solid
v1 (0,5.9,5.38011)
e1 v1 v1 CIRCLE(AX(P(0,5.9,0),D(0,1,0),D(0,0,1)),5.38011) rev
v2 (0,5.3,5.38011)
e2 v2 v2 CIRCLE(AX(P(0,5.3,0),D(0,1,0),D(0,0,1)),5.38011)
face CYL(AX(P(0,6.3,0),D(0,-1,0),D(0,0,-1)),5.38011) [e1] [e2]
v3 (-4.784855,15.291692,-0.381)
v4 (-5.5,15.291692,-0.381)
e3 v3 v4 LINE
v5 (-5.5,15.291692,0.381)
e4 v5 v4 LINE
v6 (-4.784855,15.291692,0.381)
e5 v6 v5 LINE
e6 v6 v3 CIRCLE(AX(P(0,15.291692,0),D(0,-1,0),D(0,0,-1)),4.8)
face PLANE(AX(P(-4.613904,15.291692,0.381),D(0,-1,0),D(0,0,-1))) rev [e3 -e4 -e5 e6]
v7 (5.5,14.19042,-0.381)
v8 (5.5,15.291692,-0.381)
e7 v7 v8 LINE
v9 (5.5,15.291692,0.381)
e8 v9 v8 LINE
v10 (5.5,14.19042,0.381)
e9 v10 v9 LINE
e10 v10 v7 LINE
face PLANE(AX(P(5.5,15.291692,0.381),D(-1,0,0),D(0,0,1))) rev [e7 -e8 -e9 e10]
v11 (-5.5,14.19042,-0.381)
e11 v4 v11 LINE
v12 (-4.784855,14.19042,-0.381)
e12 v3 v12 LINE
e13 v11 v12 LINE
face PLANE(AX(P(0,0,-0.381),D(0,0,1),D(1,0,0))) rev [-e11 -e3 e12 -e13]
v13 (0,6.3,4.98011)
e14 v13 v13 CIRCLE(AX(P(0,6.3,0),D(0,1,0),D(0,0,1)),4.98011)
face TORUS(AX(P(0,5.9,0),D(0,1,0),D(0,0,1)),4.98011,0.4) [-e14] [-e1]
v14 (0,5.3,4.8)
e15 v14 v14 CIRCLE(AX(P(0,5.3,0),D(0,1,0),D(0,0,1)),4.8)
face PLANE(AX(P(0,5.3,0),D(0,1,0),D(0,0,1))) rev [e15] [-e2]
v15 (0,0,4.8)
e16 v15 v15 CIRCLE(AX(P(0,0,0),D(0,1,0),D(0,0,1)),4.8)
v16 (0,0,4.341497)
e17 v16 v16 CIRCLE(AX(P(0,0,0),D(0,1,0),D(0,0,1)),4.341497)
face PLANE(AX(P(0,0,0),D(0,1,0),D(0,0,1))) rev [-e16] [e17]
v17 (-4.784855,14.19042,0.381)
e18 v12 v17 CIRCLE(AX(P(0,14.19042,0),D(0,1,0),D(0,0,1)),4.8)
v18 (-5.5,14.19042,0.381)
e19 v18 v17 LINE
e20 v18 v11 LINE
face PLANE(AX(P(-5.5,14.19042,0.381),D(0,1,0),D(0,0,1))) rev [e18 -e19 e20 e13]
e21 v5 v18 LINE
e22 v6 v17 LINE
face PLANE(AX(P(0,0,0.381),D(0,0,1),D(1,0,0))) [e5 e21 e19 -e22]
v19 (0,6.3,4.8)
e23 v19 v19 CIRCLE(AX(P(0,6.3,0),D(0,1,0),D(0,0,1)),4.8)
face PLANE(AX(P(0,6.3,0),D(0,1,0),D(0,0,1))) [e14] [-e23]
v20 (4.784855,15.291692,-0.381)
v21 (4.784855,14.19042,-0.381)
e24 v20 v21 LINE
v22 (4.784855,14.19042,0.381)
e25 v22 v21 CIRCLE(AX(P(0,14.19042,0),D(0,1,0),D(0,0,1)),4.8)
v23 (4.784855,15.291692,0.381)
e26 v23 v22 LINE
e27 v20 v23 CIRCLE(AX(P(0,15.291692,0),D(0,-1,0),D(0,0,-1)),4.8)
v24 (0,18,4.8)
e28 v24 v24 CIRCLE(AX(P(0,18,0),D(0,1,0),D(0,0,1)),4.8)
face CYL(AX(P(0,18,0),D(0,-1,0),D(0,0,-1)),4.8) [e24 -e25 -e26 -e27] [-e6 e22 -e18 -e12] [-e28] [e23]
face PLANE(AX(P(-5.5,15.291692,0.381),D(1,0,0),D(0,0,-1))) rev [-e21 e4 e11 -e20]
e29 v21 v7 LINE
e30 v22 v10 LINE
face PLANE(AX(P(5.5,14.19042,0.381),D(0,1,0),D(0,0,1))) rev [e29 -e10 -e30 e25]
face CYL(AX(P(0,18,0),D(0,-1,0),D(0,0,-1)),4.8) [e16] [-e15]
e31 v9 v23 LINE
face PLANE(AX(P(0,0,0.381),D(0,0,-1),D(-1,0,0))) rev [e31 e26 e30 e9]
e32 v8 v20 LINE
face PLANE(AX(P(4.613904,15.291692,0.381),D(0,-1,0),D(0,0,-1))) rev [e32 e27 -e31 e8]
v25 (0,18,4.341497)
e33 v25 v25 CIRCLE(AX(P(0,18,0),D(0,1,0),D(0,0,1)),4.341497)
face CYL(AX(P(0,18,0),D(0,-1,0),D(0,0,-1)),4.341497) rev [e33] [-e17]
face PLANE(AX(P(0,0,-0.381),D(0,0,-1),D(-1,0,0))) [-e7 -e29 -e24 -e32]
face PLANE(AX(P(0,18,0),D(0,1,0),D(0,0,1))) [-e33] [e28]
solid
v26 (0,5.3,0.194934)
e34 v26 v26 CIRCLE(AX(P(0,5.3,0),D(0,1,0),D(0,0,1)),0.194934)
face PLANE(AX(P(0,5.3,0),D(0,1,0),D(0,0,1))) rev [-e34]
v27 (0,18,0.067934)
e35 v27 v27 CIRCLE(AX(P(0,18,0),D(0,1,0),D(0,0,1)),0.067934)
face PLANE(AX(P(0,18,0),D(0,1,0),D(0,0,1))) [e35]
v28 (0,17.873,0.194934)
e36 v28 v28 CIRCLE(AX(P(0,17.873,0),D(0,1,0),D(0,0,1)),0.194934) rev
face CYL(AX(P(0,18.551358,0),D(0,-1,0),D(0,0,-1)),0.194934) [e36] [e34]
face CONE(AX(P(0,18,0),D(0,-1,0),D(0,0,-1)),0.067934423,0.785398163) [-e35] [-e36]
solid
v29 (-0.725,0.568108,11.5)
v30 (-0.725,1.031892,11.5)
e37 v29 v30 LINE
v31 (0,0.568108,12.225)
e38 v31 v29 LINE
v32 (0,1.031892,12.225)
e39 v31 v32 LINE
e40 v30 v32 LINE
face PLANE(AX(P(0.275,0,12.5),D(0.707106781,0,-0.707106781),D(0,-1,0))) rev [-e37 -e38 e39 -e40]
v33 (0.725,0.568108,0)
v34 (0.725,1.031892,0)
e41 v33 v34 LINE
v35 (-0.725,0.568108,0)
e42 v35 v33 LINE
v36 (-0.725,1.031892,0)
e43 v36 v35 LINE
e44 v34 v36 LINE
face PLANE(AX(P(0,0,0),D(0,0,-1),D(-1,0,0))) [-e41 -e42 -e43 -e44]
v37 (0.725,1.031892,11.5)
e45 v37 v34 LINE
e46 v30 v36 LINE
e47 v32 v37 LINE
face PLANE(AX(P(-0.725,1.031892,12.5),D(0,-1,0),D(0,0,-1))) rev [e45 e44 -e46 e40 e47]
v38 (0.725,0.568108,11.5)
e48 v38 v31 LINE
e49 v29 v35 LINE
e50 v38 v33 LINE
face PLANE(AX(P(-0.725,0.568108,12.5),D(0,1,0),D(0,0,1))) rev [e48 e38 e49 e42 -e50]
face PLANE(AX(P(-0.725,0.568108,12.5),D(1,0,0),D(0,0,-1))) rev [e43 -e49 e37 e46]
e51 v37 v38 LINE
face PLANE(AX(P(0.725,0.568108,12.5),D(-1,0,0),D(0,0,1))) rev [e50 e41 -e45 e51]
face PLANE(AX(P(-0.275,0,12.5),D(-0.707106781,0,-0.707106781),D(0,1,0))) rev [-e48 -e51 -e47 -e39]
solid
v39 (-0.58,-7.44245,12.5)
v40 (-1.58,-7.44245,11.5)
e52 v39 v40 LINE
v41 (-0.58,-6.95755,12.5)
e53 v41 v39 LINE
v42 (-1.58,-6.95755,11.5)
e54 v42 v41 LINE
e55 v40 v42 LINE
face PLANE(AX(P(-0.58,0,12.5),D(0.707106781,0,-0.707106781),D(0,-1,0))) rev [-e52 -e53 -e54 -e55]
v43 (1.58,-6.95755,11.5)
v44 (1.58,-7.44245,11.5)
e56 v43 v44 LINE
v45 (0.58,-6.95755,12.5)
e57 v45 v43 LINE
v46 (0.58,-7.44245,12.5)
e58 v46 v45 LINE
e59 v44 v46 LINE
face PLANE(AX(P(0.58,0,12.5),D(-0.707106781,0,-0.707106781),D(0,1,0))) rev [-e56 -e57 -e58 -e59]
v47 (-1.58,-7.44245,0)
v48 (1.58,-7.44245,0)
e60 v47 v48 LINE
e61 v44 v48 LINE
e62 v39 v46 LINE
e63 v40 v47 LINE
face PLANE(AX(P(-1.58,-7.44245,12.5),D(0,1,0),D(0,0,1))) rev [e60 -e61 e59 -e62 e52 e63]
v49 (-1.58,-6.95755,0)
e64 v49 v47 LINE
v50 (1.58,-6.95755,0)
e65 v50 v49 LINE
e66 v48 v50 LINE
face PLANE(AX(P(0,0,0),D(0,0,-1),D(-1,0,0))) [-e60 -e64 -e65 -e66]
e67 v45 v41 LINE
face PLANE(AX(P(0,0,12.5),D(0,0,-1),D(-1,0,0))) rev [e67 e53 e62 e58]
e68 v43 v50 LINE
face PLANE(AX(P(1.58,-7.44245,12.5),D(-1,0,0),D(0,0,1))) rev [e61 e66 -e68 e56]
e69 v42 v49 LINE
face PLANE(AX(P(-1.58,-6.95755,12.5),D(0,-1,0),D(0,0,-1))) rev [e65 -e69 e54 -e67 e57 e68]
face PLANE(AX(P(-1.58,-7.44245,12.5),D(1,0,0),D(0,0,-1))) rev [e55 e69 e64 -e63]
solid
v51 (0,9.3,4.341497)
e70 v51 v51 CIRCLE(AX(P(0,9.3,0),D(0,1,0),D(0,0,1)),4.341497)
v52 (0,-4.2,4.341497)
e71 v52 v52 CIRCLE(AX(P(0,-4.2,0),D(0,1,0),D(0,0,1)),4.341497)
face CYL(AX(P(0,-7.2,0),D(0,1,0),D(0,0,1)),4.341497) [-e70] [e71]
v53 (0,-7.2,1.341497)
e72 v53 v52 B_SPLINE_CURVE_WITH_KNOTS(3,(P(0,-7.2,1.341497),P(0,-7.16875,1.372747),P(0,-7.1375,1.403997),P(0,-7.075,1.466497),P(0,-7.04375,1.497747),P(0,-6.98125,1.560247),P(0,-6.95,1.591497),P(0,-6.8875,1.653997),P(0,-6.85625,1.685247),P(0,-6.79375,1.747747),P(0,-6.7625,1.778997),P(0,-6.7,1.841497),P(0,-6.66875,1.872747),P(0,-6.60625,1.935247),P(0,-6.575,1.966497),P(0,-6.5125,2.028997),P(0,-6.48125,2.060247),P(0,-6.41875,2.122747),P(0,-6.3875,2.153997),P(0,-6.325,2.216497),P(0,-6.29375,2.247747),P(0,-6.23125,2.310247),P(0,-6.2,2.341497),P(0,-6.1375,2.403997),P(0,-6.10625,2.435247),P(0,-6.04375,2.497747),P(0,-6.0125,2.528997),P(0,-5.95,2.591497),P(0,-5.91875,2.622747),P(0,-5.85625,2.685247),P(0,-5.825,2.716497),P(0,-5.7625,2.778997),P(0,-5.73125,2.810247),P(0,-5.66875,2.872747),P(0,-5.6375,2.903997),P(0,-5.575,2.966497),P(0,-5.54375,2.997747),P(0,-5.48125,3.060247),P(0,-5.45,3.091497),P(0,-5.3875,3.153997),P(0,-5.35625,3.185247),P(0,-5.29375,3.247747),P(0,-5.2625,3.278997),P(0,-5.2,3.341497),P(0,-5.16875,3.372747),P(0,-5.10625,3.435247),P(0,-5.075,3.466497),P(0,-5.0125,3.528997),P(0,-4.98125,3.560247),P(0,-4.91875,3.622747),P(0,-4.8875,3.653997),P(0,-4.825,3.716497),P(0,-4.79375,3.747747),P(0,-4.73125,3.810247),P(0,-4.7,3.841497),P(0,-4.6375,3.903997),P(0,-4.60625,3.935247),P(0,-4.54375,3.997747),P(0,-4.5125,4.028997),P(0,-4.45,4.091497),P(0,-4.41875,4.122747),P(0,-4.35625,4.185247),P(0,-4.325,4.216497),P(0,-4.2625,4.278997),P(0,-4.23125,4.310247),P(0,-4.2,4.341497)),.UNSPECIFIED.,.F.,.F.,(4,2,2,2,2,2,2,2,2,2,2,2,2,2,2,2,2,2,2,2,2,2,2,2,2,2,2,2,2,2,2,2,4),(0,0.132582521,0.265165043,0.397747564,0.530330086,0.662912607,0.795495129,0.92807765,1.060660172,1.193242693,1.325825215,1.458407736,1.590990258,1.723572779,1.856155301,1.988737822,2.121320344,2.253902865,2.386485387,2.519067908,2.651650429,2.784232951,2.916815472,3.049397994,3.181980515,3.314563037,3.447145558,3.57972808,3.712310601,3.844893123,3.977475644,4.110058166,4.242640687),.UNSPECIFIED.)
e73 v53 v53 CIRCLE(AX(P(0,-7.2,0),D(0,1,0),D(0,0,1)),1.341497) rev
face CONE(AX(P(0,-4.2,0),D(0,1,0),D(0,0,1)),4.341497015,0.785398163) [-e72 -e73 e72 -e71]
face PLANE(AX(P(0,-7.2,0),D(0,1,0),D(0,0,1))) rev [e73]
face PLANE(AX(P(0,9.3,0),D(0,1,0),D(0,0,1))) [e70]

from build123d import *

# Parameters (mm, degrees)
SKETCH1_R                = 4.8
SKETCH1_R_2              = 4.341497015
BOSS_EXTRUDE1_DEPTH      = 18
SKETCH2_R                = 5.380109722
SKETCH2_R_2              = 4.8
BOSS_EXTRUDE2_DEPTH      = 1
FILLET1_R                = 0.4
SKETCH3_W                = 0.886095775
SKETCH3_H                = 1.101271723
BOSS_EXTRUDE3_DEPTH      = 0.381
SKETCH4_R                = 0.194934423
BOSS_EXTRUDE4_DEPTH      = 12.7
CHAMFER1_SIZE            = 0.127
SKETCH6_W                = 1.45
SKETCH6_H                = 0.463784272
BOSS_EXTRUDE5_DEPTH      = 12.5
SKETCH6_W_2              = 3.16
SKETCH6_H_2              = 0.48490007
BOSS_EXTRUDE5_2_DEPTH    = 12.5
CHAMFER2_SIZE            = 1
CHAMFER3_SIZE            = 1
BOSS_EXTRUDE6_DEPTH      = 4
BOSS_EXTRUDE6_DEPTH_BACK = 12.5
SKETCH7_R                = 4.341497015
CHAMFER4_SIZE            = 3


with BuildPart() as part:
    # Sketch1 → Boss-Extrude1 (new body)
    with BuildSketch(Plane(origin=(0, 0, 0), x_dir=(1, 0, 0), z_dir=(0, 1, 0))):
        with Locations(Location((0, 0, 0), (0, 0, 270))):
            Circle(SKETCH1_R)
        with Locations(Location((0, 0, 0), (0, 0, 270))):
            Circle(SKETCH1_R_2, mode=Mode.SUBTRACT)
    extrude(amount=BOSS_EXTRUDE1_DEPTH)

    # Sketch2 → Boss-Extrude2 (add)
    with BuildSketch(Plane(origin=(0, 5.3, 0), x_dir=(1, 0, 0), z_dir=(0, 1, 0))):
        with Locations(Location((0, 0, 0), (0, 0, 270))):
            Circle(SKETCH2_R)
        with Locations(Location((0, 0, 0), (0, 0, 270))):
            Circle(SKETCH2_R_2, mode=Mode.SUBTRACT)
    extrude(amount=BOSS_EXTRUDE2_DEPTH)

    # Fillet1
    fillet1_edges = [part.edges().sort_by_distance(p)[0] for p in [
        (0, 6.3, -5.380109722),
    ]]
    fillet(fillet1_edges, radius=FILLET1_R)

    # Sketch3 → Boss-Extrude3 (add, symmetric)
    with BuildSketch(Plane.XY):
        with Locations((-5.056952113, 14.74105587)):
            Rectangle(SKETCH3_W, SKETCH3_H)
        with Locations((5.056952113, 14.74105587)):
            Rectangle(SKETCH3_W, SKETCH3_H)
    extrude(amount=BOSS_EXTRUDE3_DEPTH, both=True)


with BuildPart() as body_2:
    # Sketch4 → Boss-Extrude4 (new body)
    with BuildSketch(Plane(origin=(0, 5.3, 0), x_dir=(1, 0, 0), z_dir=(0, 1, 0))):
        with Locations(Location((0, 0, 0), (0, 0, 270))):
            Circle(SKETCH4_R)
    extrude(amount=BOSS_EXTRUDE4_DEPTH)

    # Chamfer1
    chamfer1_edges = [body_2.edges().sort_by_distance(p)[0] for p in [
        (0, 18, -0.194934423),
    ]]
    chamfer(chamfer1_edges, length=CHAMFER1_SIZE)


with BuildPart() as body_3:
    # Sketch6 → Boss-Extrude5 (new body)
    with BuildSketch(Plane.XY):
        with Locations((0, 0.8)):
            Rectangle(SKETCH6_W, SKETCH6_H)
    extrude(amount=BOSS_EXTRUDE5_DEPTH)

    # Chamfer2
    # the kernel refuses this chamfer: 1 mm, written as the material it takes off along each edge
    with BuildSketch(Plane(origin=(-0.725, 3.603575124, 12.5), x_dir=(-0.027495876610586403, 0, -0.9996219169112968), z_dir=(0, -1, 0)), Plane(origin=(0.725, -2.003575124, 12.5), x_dir=(0.027495876610586403, 0, -0.9996219169112968), z_dir=(0, 1, 0))) as chamfer2_piece_1:
        Polygon((CHAMFER2_SIZE * 0.999621916911, CHAMFER2_SIZE * 0.0274958766106), (-CHAMFER2_SIZE * 0.0274958766106, CHAMFER2_SIZE * 0.999621916911), (0, 0), align=None)
    extrude(amount=5.607150248, mode=Mode.SUBTRACT)


with BuildPart() as body_4:
    # Sketch6 → Boss-Extrude5 2 (new body)
    with BuildSketch(Plane.XY):
        with Locations((0, -7.2)):
            Rectangle(SKETCH6_W_2, SKETCH6_H_2)
    extrude(amount=BOSS_EXTRUDE5_2_DEPTH)

    # Chamfer3
    chamfer3_edges = [body_4.edges().sort_by_distance(p)[0] for p in [
        (-1.58, -7.2, 12.5),
        (1.58, -7.2, 12.5),
    ]]
    chamfer(chamfer3_edges, length=CHAMFER3_SIZE)


with BuildPart() as body_5:
    # Sketch7 → Boss-Extrude6 (new, two sides: drawn at the far end of the back side and taken through both)
    with BuildSketch(Plane(origin=(0, 5.3, 0), x_dir=(1, 0, 0), z_dir=(0, 1, 0)).offset(-BOSS_EXTRUDE6_DEPTH_BACK)):
        with Locations(Location((0, 0, 0), (0, 0, 270))):
            Circle(SKETCH7_R)
    extrude(amount=BOSS_EXTRUDE6_DEPTH + BOSS_EXTRUDE6_DEPTH_BACK)

    # Chamfer4
    chamfer4_edges = [body_5.edges().sort_by_distance(p)[0] for p in [
        (0, -7.2, -4.341497015),
    ]]
    chamfer(chamfer4_edges, length=CHAMFER4_SIZE)


solid = Compound([part.part, body_2.part, body_3.part, body_4.part, body_5.part])
